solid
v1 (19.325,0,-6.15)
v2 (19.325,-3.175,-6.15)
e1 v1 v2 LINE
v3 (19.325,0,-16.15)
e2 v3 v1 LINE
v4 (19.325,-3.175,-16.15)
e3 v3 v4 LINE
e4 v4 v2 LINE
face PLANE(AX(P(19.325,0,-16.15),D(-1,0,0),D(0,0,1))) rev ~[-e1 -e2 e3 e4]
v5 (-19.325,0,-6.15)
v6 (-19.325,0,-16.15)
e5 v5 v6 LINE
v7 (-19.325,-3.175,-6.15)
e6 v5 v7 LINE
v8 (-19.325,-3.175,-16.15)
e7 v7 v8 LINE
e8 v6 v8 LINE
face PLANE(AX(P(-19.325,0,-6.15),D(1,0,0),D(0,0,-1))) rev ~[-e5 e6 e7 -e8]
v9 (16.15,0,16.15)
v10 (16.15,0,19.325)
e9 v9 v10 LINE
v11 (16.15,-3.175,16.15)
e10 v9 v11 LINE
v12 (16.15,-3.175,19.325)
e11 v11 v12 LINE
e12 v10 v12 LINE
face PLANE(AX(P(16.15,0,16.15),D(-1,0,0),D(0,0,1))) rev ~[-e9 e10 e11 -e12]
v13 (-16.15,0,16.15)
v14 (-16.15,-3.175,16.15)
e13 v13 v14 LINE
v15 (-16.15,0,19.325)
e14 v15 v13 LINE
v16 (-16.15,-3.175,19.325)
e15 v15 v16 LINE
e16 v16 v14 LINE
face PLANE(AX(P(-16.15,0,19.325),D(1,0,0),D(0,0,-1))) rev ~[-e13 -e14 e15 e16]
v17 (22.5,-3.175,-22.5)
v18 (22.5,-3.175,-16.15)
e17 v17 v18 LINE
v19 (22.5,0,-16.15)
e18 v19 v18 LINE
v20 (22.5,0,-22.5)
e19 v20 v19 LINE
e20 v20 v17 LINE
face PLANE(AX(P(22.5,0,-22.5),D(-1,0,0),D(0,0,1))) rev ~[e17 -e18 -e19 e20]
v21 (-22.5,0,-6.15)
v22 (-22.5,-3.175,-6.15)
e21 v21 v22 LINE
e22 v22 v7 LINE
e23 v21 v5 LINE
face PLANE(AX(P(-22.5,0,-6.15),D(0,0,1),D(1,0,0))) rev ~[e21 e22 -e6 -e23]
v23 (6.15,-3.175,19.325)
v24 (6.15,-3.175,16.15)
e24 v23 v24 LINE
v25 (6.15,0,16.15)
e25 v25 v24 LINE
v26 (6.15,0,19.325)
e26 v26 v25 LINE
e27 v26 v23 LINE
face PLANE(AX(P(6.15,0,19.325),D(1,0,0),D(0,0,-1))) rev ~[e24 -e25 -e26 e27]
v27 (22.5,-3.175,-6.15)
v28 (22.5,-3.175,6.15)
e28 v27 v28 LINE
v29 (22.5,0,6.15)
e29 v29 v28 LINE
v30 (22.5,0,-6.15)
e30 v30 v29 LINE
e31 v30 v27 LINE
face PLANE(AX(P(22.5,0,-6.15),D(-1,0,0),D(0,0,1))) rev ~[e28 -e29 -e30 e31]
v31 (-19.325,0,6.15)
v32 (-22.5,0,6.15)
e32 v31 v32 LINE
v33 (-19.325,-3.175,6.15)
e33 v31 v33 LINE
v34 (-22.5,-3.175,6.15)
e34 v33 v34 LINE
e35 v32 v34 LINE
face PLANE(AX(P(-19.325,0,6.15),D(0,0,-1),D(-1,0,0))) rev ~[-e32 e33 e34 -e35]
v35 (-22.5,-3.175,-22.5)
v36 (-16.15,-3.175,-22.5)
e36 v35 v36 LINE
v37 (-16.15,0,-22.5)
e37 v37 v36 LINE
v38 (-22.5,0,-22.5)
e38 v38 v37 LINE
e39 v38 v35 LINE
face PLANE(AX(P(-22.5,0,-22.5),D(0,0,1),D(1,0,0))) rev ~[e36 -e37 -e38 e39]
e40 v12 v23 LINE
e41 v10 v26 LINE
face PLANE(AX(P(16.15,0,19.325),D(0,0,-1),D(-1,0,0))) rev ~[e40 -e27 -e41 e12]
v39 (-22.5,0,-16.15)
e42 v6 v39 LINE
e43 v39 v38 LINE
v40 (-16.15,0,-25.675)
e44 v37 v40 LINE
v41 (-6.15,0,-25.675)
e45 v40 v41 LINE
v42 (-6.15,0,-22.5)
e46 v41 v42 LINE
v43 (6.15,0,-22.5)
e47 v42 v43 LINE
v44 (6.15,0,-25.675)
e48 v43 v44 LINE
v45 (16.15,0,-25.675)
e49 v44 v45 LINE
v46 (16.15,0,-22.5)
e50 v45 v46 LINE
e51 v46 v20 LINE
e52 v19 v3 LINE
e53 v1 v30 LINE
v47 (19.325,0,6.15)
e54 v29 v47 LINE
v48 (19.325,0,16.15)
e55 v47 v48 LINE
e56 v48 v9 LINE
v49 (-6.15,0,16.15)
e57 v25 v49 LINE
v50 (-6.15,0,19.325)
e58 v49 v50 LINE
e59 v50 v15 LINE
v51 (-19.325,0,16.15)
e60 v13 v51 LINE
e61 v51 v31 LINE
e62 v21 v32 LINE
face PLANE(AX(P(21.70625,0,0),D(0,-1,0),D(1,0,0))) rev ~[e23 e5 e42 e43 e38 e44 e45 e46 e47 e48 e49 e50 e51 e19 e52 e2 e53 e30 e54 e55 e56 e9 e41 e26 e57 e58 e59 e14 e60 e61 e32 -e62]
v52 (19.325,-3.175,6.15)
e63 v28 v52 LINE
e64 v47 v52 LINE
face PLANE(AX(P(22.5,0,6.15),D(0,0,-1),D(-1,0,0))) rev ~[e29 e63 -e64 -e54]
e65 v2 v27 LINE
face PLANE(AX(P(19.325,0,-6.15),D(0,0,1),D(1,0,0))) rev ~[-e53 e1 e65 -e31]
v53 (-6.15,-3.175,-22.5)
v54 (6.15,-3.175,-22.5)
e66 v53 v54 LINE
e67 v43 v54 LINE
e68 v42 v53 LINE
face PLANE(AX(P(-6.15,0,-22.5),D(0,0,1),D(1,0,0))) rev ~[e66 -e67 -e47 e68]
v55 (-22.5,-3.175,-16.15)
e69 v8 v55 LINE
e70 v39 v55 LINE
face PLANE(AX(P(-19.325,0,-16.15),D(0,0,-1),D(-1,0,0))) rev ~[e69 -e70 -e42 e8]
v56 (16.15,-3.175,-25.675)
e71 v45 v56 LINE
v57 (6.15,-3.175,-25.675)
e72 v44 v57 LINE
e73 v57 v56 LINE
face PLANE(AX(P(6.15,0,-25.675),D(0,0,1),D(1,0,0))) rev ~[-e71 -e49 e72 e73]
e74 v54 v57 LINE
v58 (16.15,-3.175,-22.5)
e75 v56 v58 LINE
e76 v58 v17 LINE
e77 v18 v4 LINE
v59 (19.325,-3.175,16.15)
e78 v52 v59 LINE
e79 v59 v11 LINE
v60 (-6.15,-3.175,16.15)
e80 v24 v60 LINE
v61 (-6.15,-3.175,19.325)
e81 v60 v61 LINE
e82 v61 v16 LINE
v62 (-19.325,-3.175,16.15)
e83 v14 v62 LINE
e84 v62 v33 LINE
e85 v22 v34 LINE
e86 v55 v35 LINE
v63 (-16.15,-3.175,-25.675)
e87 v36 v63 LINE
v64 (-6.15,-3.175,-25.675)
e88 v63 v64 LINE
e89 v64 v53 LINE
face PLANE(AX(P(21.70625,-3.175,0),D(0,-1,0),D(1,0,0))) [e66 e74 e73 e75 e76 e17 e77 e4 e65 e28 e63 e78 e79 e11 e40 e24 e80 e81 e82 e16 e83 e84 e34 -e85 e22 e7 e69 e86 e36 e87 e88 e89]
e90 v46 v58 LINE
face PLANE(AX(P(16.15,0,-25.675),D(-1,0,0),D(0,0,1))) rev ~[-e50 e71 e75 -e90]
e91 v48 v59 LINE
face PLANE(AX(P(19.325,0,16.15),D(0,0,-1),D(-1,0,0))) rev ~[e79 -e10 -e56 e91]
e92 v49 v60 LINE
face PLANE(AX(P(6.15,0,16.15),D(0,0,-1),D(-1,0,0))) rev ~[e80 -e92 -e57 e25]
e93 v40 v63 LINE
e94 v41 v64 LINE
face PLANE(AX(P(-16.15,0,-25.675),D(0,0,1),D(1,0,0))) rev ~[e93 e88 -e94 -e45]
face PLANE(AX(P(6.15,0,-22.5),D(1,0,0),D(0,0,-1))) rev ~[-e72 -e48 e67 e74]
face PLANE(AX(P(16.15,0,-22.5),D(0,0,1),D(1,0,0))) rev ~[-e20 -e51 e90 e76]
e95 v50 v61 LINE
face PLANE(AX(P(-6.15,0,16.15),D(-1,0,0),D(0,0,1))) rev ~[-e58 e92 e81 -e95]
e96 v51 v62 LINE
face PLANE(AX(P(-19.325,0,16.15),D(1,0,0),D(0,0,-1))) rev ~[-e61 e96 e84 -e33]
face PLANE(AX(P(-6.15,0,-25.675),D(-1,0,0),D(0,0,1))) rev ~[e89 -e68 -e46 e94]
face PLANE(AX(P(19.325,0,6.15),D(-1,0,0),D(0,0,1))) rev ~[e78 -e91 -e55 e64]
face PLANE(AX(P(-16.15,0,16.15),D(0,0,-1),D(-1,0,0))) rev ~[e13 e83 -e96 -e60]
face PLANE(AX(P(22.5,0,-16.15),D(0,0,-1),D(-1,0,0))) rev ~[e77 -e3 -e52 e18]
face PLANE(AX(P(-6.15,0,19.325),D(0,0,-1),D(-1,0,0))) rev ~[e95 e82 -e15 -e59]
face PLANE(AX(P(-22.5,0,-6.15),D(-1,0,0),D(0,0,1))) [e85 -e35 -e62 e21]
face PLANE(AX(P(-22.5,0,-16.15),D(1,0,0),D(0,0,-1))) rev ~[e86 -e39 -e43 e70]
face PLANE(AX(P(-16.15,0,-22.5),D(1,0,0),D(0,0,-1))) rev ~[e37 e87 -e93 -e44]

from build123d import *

# Parameters (mm, degrees)
F0_W     = 1.5875
F0_H     = 12.3
F1_DEPTH = 3.175


# Not quite as in the source:
# - a length typed as a fraction of an inch, garbled in the dataset ("3 / 203.2 mm" for 3/8 in), is restored
# - a feature names something its author has since deleted; it is built from what else it names


with BuildPart() as f1:
    # F0 (on Front) → F1 (new body)
    with BuildSketch(Plane.XZ):
        with Locations((21.70625, 0)):
            Rectangle(F0_W, F0_H)
        with Locations((-21.70625, 0)):
            Rectangle(F0_W, F0_H)
        Polygon((-22.5, -16.15), (-22.5, -22.5), (-16.15, -22.5), (-16.15, -25.675), (-6.15, -25.675), (-6.15, -22.5), (6.15, -22.5), (6.15, -25.675), (16.15, -25.675), (16.15, -22.5), (22.5, -22.5), (22.5, -16.15), (19.325, -16.15), (19.325, -6.15), (20.9125, -6.15), (20.9125, 6.15), (19.325, 6.15), (19.325, 16.15), (16.15, 16.15), (16.15, 19.325), (6.15, 19.325), (6.15, 16.15), (-6.15, 16.15), (-6.15, 19.325), (-16.15, 19.325), (-16.15, 16.15), (-19.325, 16.15), (-19.325, 6.15), (-20.9125, 6.15), (-20.9125, -6.15), (-19.325, -6.15), (-19.325, -16.15), align=None)
    extrude(amount=F1_DEPTH)


solid = f1.part
